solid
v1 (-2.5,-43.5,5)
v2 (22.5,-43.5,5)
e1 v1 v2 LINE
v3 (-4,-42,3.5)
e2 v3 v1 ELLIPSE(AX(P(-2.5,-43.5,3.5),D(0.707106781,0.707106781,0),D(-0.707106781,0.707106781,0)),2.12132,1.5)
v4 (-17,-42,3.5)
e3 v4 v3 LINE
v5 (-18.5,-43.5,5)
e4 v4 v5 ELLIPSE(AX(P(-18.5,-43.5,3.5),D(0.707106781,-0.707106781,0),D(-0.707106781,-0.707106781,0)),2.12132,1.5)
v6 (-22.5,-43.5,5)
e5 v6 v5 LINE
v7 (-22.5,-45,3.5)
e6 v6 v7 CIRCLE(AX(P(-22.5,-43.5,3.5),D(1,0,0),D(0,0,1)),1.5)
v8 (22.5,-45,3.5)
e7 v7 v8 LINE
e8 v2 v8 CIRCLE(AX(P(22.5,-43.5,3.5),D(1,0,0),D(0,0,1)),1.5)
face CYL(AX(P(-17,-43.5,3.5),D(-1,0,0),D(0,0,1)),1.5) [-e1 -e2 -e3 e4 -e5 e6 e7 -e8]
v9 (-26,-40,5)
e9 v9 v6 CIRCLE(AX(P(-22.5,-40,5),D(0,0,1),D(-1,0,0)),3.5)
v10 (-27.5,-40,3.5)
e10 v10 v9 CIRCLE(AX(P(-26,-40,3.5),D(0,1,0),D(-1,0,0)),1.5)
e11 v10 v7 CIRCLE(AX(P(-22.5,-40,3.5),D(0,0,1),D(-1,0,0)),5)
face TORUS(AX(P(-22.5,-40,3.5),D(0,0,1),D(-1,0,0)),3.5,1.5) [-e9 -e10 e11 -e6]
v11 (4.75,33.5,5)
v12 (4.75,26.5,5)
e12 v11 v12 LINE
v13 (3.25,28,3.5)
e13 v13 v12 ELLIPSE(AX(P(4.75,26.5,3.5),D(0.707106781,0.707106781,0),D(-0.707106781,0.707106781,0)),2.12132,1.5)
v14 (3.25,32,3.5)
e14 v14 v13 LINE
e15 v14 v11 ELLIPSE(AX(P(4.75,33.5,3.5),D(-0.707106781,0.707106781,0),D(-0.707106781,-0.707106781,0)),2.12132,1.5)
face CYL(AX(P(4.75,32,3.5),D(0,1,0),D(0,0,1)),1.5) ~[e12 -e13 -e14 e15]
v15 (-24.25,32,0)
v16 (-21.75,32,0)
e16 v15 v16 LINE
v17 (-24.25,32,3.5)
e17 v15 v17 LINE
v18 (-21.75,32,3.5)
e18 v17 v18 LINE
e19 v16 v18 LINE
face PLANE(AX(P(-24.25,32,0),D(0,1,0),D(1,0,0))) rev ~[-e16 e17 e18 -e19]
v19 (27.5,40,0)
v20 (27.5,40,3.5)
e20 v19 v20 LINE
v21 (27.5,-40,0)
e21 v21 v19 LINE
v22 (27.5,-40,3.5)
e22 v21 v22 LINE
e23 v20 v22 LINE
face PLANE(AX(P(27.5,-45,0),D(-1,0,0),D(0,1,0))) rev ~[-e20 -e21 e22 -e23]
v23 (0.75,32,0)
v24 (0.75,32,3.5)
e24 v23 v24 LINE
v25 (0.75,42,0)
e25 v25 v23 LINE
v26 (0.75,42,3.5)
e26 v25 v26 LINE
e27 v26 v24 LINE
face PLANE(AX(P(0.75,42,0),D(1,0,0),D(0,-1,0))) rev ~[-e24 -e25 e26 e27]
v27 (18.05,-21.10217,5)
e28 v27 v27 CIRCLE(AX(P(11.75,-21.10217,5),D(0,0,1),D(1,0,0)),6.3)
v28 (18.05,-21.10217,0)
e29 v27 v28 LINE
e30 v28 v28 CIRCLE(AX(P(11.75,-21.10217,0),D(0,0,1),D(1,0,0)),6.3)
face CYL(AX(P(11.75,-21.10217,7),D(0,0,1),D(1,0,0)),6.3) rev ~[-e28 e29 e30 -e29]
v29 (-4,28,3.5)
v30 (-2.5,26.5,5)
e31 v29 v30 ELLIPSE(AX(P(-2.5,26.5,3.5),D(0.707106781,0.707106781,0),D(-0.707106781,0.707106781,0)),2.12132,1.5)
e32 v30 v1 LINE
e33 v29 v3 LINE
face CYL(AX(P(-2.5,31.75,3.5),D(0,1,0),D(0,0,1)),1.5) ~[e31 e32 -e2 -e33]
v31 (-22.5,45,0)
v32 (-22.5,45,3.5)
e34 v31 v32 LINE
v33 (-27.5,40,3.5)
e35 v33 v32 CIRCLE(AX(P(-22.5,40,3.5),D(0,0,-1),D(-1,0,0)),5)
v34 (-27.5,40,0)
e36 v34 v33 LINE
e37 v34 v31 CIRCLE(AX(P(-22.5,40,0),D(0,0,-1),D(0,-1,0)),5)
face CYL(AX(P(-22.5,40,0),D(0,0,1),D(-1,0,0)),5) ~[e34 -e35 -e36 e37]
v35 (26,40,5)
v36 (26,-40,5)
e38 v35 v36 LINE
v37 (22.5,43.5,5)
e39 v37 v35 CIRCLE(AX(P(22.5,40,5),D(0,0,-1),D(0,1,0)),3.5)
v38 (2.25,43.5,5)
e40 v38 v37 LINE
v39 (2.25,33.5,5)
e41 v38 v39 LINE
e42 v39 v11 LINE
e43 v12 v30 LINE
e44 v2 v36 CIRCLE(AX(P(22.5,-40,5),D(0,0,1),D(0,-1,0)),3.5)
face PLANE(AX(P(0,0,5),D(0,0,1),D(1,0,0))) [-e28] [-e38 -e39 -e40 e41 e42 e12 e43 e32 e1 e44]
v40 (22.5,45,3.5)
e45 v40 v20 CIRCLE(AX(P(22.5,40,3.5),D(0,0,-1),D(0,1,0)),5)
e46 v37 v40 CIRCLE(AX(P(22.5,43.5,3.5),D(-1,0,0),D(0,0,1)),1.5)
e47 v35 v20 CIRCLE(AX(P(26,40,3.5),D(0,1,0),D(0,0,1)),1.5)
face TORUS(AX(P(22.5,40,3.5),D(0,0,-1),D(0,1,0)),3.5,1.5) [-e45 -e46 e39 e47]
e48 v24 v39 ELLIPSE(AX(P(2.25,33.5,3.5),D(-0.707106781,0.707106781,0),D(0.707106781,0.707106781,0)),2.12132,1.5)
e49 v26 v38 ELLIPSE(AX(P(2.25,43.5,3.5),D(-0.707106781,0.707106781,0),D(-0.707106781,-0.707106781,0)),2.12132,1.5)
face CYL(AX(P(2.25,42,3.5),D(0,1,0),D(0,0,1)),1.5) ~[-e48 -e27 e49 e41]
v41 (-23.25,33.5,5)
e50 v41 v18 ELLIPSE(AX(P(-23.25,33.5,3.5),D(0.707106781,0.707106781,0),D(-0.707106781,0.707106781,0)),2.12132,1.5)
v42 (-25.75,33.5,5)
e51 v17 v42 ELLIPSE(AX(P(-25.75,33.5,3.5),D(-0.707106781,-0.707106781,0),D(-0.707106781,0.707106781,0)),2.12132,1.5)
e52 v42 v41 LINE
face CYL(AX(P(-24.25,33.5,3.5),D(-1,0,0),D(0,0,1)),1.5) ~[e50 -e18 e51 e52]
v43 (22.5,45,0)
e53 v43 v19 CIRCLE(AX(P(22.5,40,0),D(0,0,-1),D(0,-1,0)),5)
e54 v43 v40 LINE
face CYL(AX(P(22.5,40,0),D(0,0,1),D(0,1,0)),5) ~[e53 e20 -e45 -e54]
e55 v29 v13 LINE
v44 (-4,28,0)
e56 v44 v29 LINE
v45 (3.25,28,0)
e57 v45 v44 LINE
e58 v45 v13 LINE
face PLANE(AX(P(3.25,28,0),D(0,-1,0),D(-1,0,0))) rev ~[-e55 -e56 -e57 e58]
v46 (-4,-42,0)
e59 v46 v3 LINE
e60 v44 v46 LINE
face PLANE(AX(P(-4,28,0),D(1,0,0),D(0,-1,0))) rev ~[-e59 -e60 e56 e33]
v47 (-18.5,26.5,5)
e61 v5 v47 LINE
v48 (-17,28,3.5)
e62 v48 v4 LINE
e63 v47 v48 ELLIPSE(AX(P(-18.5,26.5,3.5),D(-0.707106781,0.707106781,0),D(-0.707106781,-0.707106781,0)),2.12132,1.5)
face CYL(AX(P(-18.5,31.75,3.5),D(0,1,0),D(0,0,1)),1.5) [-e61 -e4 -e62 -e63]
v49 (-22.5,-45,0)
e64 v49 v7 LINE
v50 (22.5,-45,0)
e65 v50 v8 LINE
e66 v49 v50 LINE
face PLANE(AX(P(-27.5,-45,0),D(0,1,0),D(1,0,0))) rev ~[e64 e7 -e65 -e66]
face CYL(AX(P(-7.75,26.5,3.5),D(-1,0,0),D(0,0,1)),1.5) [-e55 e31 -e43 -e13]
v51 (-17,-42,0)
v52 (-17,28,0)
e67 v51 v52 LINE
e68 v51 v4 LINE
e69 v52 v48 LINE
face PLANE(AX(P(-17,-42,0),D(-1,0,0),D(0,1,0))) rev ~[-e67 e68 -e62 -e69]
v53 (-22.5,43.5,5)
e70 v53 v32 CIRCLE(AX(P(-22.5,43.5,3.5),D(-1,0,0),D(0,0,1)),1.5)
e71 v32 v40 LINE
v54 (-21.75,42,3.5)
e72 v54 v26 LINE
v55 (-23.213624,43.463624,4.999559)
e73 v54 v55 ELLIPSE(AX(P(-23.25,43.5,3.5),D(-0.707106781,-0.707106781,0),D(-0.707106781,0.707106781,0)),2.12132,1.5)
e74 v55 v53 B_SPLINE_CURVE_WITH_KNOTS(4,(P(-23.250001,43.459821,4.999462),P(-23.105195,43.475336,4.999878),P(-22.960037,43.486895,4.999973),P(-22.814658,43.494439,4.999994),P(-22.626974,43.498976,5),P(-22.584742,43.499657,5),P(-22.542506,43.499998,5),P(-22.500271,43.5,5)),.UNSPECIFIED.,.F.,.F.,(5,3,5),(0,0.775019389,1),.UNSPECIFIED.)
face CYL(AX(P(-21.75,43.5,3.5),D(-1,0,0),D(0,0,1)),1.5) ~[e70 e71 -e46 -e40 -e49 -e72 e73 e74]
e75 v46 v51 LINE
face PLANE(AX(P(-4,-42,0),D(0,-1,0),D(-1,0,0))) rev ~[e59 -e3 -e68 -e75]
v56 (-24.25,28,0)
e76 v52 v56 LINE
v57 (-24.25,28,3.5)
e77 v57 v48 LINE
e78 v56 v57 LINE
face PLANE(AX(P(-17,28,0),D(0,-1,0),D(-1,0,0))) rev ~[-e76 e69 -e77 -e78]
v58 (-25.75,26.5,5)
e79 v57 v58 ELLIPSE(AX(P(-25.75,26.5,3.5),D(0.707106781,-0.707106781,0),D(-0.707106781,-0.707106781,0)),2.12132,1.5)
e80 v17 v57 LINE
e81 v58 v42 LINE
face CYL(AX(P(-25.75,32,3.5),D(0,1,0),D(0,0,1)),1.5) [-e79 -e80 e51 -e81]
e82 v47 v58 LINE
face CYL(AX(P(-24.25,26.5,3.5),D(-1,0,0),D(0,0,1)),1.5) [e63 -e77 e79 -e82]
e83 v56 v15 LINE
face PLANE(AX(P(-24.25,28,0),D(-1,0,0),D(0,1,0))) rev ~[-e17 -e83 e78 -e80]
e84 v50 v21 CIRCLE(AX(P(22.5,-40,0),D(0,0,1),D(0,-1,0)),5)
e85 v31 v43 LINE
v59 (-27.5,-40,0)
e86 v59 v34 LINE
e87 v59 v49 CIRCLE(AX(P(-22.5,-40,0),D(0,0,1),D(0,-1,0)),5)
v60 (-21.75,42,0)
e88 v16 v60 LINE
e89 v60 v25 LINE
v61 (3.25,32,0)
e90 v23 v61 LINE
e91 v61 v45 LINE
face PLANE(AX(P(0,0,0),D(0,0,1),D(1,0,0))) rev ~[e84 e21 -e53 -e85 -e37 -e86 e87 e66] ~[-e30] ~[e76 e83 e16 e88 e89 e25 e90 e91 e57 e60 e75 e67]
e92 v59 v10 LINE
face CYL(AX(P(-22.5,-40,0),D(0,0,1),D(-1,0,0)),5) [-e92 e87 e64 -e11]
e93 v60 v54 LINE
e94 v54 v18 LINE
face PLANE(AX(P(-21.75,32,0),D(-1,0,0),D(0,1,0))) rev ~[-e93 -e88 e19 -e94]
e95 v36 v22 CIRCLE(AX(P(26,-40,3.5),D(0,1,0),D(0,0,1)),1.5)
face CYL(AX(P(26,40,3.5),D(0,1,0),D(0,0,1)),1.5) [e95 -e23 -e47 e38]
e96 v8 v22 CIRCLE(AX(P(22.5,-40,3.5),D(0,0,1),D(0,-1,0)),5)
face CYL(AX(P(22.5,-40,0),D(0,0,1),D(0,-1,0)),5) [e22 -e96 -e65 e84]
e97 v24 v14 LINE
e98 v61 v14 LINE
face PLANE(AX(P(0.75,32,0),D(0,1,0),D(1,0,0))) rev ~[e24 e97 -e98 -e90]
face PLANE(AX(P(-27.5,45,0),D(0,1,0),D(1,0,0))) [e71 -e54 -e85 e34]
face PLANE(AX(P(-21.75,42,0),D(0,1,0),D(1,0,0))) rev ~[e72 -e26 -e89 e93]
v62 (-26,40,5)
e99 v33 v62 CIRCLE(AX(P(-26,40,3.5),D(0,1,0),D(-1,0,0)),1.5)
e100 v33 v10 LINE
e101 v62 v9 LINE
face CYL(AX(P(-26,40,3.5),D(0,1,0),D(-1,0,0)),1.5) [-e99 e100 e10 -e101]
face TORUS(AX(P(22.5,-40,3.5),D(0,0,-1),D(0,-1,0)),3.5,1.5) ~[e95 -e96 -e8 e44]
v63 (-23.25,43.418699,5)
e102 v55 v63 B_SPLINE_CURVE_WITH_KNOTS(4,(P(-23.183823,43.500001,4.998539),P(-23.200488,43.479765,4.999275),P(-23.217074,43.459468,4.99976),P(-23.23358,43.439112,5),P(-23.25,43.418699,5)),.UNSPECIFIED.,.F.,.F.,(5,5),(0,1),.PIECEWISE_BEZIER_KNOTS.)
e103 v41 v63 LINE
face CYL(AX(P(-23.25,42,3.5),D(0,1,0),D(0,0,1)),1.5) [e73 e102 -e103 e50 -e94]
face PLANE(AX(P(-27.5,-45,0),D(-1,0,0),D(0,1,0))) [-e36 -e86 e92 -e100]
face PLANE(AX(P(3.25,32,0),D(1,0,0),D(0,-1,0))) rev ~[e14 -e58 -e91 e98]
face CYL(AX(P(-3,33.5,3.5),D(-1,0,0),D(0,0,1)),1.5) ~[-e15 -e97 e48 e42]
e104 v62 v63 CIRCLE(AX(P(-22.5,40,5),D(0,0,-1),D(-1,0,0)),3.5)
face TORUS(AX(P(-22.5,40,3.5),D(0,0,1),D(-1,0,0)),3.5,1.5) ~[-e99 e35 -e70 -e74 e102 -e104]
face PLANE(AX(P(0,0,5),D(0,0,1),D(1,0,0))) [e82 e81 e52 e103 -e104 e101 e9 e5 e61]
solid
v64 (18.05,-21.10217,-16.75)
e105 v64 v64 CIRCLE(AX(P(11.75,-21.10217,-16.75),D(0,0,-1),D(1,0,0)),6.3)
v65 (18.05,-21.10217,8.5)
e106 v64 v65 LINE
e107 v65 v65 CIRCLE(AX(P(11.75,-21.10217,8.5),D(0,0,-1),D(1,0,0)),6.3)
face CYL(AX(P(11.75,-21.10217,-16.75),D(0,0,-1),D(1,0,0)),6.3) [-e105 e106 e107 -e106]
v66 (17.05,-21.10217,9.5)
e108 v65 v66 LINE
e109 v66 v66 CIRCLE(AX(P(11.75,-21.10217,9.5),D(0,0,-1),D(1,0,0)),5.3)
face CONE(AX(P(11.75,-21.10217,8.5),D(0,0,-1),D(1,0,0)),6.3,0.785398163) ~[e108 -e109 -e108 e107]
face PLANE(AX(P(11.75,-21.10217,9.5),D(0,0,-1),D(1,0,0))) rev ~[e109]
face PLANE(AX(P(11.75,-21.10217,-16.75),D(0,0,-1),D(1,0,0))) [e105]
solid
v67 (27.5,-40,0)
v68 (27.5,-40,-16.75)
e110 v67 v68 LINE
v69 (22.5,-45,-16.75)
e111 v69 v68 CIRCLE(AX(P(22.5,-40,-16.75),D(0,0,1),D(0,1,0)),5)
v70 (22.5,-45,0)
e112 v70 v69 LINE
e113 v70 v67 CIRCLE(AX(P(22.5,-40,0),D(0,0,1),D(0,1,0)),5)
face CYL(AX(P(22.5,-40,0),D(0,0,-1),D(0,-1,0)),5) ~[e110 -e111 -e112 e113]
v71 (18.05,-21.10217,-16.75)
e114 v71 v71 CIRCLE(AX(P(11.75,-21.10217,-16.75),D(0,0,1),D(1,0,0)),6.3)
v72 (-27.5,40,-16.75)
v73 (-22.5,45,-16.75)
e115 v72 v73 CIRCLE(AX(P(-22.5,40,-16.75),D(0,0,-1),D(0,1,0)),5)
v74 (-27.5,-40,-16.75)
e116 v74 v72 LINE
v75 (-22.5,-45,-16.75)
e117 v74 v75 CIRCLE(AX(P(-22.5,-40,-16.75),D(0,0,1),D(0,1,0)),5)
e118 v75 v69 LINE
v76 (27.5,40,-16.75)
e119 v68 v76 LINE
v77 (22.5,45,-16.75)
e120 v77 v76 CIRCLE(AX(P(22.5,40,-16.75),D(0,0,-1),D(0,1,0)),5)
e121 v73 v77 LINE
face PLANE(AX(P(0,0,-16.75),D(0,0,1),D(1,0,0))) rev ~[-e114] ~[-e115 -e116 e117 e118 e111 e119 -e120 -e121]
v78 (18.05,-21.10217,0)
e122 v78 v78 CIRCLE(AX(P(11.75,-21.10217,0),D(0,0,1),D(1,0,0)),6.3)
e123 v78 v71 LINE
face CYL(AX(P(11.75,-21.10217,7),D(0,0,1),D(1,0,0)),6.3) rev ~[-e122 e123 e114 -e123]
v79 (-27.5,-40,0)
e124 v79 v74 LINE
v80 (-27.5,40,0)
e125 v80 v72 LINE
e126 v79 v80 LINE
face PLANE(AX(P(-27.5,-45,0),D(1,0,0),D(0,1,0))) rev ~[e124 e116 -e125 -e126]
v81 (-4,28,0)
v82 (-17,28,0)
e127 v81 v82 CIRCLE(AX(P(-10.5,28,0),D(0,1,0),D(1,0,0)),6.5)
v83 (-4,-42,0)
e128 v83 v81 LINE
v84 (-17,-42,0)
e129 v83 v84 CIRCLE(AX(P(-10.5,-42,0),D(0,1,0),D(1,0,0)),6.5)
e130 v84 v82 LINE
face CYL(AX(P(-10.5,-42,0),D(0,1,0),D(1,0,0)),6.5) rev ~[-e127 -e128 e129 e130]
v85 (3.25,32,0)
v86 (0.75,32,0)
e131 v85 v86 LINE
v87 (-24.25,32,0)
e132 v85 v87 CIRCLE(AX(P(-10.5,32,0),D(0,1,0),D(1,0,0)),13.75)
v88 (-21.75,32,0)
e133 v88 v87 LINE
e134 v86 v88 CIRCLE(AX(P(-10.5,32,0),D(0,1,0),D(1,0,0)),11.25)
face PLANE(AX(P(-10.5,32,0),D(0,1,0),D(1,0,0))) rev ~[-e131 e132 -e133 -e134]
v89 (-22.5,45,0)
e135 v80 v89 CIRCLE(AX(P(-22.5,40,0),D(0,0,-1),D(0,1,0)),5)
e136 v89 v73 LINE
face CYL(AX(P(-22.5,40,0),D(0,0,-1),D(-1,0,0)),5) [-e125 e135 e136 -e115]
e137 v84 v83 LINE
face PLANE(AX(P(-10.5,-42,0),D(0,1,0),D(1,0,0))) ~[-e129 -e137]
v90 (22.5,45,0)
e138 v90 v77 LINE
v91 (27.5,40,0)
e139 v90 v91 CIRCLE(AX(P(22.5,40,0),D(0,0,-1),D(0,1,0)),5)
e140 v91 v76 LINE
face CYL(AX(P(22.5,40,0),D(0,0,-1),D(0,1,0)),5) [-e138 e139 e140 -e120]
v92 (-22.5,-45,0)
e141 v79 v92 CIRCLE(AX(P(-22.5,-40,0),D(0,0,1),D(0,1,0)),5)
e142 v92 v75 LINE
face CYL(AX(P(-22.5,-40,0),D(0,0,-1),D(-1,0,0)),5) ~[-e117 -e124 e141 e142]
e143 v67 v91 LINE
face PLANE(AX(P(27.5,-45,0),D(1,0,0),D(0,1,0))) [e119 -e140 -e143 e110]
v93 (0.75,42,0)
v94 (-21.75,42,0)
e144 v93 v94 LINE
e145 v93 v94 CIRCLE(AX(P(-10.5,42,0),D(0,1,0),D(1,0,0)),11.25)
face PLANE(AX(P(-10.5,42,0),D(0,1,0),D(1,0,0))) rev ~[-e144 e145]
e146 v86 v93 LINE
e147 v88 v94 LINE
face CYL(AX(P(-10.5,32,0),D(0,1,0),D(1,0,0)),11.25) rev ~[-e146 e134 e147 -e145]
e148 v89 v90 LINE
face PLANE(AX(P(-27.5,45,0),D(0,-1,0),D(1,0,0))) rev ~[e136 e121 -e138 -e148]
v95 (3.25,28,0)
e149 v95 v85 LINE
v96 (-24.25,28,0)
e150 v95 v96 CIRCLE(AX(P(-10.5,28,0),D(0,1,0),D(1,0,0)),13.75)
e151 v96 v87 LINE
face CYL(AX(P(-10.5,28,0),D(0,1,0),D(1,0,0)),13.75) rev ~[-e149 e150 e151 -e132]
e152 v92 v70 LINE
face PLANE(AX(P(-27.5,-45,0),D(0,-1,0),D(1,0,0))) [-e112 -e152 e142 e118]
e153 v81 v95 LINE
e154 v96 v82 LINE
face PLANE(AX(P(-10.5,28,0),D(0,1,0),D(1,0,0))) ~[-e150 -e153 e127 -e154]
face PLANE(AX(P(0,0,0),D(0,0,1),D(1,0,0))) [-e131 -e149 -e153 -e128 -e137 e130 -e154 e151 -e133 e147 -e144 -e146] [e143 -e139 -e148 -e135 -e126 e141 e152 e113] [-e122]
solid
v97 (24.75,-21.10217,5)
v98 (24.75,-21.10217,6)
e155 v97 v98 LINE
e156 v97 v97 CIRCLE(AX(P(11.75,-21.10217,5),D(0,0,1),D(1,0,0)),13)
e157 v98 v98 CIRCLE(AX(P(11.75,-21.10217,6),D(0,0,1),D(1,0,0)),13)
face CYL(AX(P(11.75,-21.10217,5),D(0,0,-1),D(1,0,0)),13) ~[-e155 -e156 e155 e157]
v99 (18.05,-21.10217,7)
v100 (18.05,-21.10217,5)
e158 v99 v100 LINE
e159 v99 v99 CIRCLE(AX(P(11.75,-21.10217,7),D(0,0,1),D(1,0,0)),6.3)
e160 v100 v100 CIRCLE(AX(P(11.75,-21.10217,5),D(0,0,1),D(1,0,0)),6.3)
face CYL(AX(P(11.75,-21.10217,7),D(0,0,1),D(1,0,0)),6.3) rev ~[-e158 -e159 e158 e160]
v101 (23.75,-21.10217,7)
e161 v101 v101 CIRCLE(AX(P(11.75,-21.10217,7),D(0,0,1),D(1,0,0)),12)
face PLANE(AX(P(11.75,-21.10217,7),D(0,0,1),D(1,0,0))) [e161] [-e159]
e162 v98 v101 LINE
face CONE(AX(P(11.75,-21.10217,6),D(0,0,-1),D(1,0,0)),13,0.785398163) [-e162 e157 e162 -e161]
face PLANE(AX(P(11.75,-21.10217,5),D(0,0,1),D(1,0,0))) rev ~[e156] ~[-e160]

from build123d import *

# Parameters (mm, degrees)
F0_W           = 55
F0_H           = 90
F1_DEPTH       = 16.75
F4_R           = 13
F5_DEPTH       = 2
F7_W           = 55
F7_H           = 90
F8_DEPTH       = 5
F9_R           = 13
F10_DEPTH      = 2
F11_R          = 6.3
F12_DEPTH      = 23.751
F13_R          = 5
F13_2_R        = 5
F14_SIZE       = 1
F15_T1_DEPTH   = 22.5
F15_T3_DEPTH   = 13.75
F15_T5_DEPTH   = 6.25
F15_T7_DEPTH   = 4
F15_T9_DEPTH   = 11
F15_T11_DEPTH  = 73.75
F15_T13_DEPTH  = 13
F15_T15_DEPTH  = 11
F15_T17_DEPTH  = 6.25
F15_T19_DEPTH  = 80
F15_T21_DEPTH  = 45
F15_T24_ANGLE  = 90
F15_T26_ANGLE  = 90
F15_T28_ANGLE  = 90
F15_T30_ANGLE  = 90
F15_T35_DEPTH  = 26.25
F15_T39_DEPTH  = 17.5
F15_T46_DEPTH  = 26.25
F15_T50_DEPTH  = 17.5
F15_T57_DEPTH  = 10
F15_T61_DEPTH  = 7.75
F15_T68_DEPTH  = 7.75
F15_T72_DEPTH  = 14.75
F15_T79_DEPTH  = 77.5
F15_T83_DEPTH  = 16.75
F15_T90_DEPTH  = 77.5
F15_T94_DEPTH  = 16.75
F15_T101_DEPTH = 7.75
F15_T105_DEPTH = 14.75
F15_T112_DEPTH = 10
F15_T116_DEPTH = 7.75
F16_R          = 6.3
F17_DEPTH      = 26.25
F18_SIZE       = 1


# Not quite as in the source:
# - a fillet or chamfer that OpenCascade refuses, or shapes differently, is made with other operations: its cross-section is extruded or revolved along the edge and cut away or added


with BuildPart() as f1:
    # F0 (on Top) → F1 (new body)
    with BuildSketch(Plane.XY):
        Rectangle(F0_W, F0_H)
    extrude(amount=-F1_DEPTH)

    # F2 (on face) → F3 (revolve, cut)
    with BuildSketch(Plane.XY):
        Polygon((0.75, 42), (-10.5, 42), (-10.5, -42), (-4, -42), (-4, 28), (3.25, 28), (3.25, 32), (0.75, 32), align=None)
    revolve(axis=Axis((-10.5, 0, 0), (0, 1, 0)), mode=Mode.SUBTRACT)


with BuildPart() as f5:
    # F4 (on face) → F5 (new body)
    with BuildSketch(Plane.XY):
        with Locations((12.5, -25)):
            Circle(F4_R)
    extrude(amount=F5_DEPTH)


with BuildPart() as f8:
    # F7 (on face) → F8 (new body)
    with BuildSketch(Plane.XY):
        Rectangle(F7_W, F7_H)
        Polygon((-21.75, 42), (0.75, 42), (0.75, 32), (3.25, 32), (3.25, 28), (-4, 28), (-4, -42), (-17, -42), (-17, 28), (-24.25, 28), (-24.25, 32), (-21.75, 32), align=None, mode=Mode.SUBTRACT)
    extrude(amount=F8_DEPTH)


with BuildPart() as f10:
    # F9 (on face) → F10 (new body)
    with BuildSketch(Plane.XY.offset(5)):
        with Locations((11.75, -21.1021695286)):
            Circle(F9_R)
    extrude(amount=F10_DEPTH)


with BuildPart() as f12_tool:
    # F11 (on face) → F12 (new body, through all)
    with BuildSketch(Plane.XY.offset(7)):
        with Locations((11.75, -21.1021695286)):
            Circle(F11_R)
    extrude(amount=-F12_DEPTH)


with BuildPart() as f1_1:
    add(f1.part)

    # F12: cut by f12_tool
    add(f12_tool.part, mode=Mode.SUBTRACT)

    # F13
    f13_edges = [f1_1.edges().sort_by_distance(p)[0] for p in [
        (-27.5, -45, -8.375),
        (27.5, -45, -8.375),
        (27.5, 45, -8.375),
        (-27.5, 45, -8.375),
    ]]
    fillet(f13_edges, radius=F13_R)


with BuildPart() as f8_1:
    add(f8.part)

    # F12: cut by f12_tool
    add(f12_tool.part, mode=Mode.SUBTRACT)

    # F13#2
    f13_2_edges = [f8_1.edges().sort_by_distance(p)[0] for p in [
        (-27.5, -45, 2.5),
        (27.5, -45, 2.5),
        (27.5, 45, 2.5),
        (-27.5, 45, 2.5),
    ]]
    fillet(f13_2_edges, radius=F13_2_R)

    # F15: fillet of radius 1.5 on 13 edges, made by hand

    # F15_s2 → F15_t1 (cut)
    with BuildSketch(Plane.YZ.offset(-21.75)):
        with BuildLine():
            ThreePointArc((43.5, 5), (42.4393398282, 4.5606601718), (42, 3.5))
            Line((42, 3.5), (42, 5))
            Line((42, 5), (43.5, 5))
        make_face()
    extrude(amount=F15_T1_DEPTH, mode=Mode.SUBTRACT)

    # F15_s4 → F15_t3 (cut)
    with BuildSketch(Plane.XZ.offset(-42)):
        with BuildLine():
            ThreePointArc((-23.25, 5), (-22.1893398282, 4.5606601718), (-21.75, 3.5))
            Line((-21.75, 3.5), (-21.75, 5))
            Line((-21.75, 5), (-23.25, 5))
        make_face()
        with BuildLine():
            ThreePointArc((2.25, 5), (1.1893398282, 4.5606601718), (0.75, 3.5))
            Line((0.75, 3.5), (0.75, 5))
            Line((0.75, 5), (2.25, 5))
        make_face()
    extrude(amount=F15_T3_DEPTH, mode=Mode.SUBTRACT)

    # F15_s6 → F15_t5 (cut)
    with BuildSketch(Plane.YZ.offset(-24.25)):
        with BuildLine():
            ThreePointArc((33.5, 5), (32.4393398282, 4.5606601718), (32, 3.5))
            Line((32, 3.5), (32, 5))
            Line((32, 5), (33.5, 5))
        make_face()
    extrude(amount=F15_T5_DEPTH, mode=Mode.SUBTRACT)

    # F15_s8 → F15_t7 (cut)
    with BuildSketch(Plane.XZ.offset(-32)):
        with BuildLine():
            ThreePointArc((-25.75, 5), (-24.6893398282, 4.5606601718), (-24.25, 3.5))
            Line((-24.25, 3.5), (-24.25, 5))
            Line((-24.25, 5), (-25.75, 5))
        make_face()
        with BuildLine():
            ThreePointArc((4.75, 5), (3.6893398282, 4.5606601718), (3.25, 3.5))
            Line((3.25, 3.5), (3.25, 5))
            Line((3.25, 5), (4.75, 5))
        make_face()
    extrude(amount=F15_T7_DEPTH, mode=Mode.SUBTRACT)

    # F15_s10 → F15_t9 (cut)
    with BuildSketch(Plane.YZ.offset(-24.25)):
        with BuildLine():
            ThreePointArc((26.5, 5), (27.5606601718, 4.5606601718), (28, 3.5))
            Line((28, 3.5), (28, 5))
            Line((28, 5), (26.5, 5))
        make_face()
    extrude(amount=F15_T9_DEPTH, mode=Mode.SUBTRACT)

    # F15_s12 → F15_t11 (cut)
    with BuildSketch(Plane.XZ.offset(-31.75)):
        with BuildLine():
            ThreePointArc((-18.5, 5), (-17.4393398282, 4.5606601718), (-17, 3.5))
            Line((-17, 3.5), (-17, 5))
            Line((-17, 5), (-18.5, 5))
        make_face()
        with BuildLine():
            ThreePointArc((-2.5, 5), (-3.5606601718, 4.5606601718), (-4, 3.5))
            Line((-4, 3.5), (-4, 5))
            Line((-4, 5), (-2.5, 5))
        make_face()
    extrude(amount=F15_T11_DEPTH, mode=Mode.SUBTRACT)

    # F15_s14 → F15_t13 (cut)
    with BuildSketch(Plane.YZ.offset(-17)):
        with BuildLine():
            ThreePointArc((-43.5, 5), (-42.4393398282, 4.5606601718), (-42, 3.5))
            Line((-42, 3.5), (-42, 5))
            Line((-42, 5), (-43.5, 5))
        make_face()
    extrude(amount=F15_T13_DEPTH, mode=Mode.SUBTRACT)

    # F15_s16 → F15_t15 (cut)
    with BuildSketch(Plane.YZ.offset(-7.75)):
        with BuildLine():
            ThreePointArc((26.5, 5), (27.5606601718, 4.5606601718), (28, 3.5))
            Line((28, 3.5), (28, 5))
            Line((28, 5), (26.5, 5))
        make_face()
    extrude(amount=F15_T15_DEPTH, mode=Mode.SUBTRACT)

    # F15_s18 → F15_t17 (cut)
    with BuildSketch(Plane.YZ.offset(-3)):
        with BuildLine():
            ThreePointArc((33.5, 5), (32.4393398282, 4.5606601718), (32, 3.5))
            Line((32, 3.5), (32, 5))
            Line((32, 5), (33.5, 5))
        make_face()
    extrude(amount=F15_T17_DEPTH, mode=Mode.SUBTRACT)

    # F15_s20 → F15_t19 (cut)
    with BuildSketch(Plane.XZ.offset(-40)):
        with BuildLine():
            ThreePointArc((26, 5), (27.0606601718, 4.5606601718), (27.5, 3.5))
            Line((27.5, 3.5), (27.5, 5))
            Line((27.5, 5), (26, 5))
        make_face()
        with BuildLine():
            ThreePointArc((-27.5, 3.5), (-27.0606601718, 4.5606601718), (-26, 5))
            Line((-26, 5), (-27.5, 5))
            Line((-27.5, 5), (-27.5, 3.5))
        make_face()
    extrude(amount=F15_T19_DEPTH, mode=Mode.SUBTRACT)

    # F15_s22 → F15_t21 (cut)
    with BuildSketch(Plane.YZ.offset(-22.5)):
        with BuildLine():
            ThreePointArc((43.5, 5), (44.5606601718, 4.5606601718), (45, 3.5))
            Line((45, 3.5), (45, 5))
            Line((45, 5), (43.5, 5))
        make_face()
        with BuildLine():
            ThreePointArc((-43.5, 5), (-44.5606601718, 4.5606601718), (-45, 3.5))
            Line((-45, 3.5), (-45, 5))
            Line((-45, 5), (-43.5, 5))
        make_face()
    extrude(amount=F15_T21_DEPTH, mode=Mode.SUBTRACT)

    # F15_s23 → F15_t24 (revolve, cut)
    with BuildSketch(Plane.YZ.offset(22.5)):
        with BuildLine():
            ThreePointArc((-43.5, 5), (-44.5606601718, 4.5606601718), (-45, 3.5))
            Line((-45, 3.5), (-45, 5))
            Line((-45, 5), (-43.5, 5))
        make_face()
    revolve(axis=Axis((22.5, -40, 5), (0, 0, 1)), revolution_arc=F15_T24_ANGLE, mode=Mode.SUBTRACT)

    # F15_s25 → F15_t26 (revolve, cut)
    with BuildSketch(Plane.YZ.offset(22.5)):
        with BuildLine():
            ThreePointArc((43.5, 5), (44.5606601718, 4.5606601718), (45, 3.5))
            Line((45, 3.5), (45, 5))
            Line((45, 5), (43.5, 5))
        make_face()
    revolve(axis=Axis((22.5, 40, 5), (0, 0, -1)), revolution_arc=F15_T26_ANGLE, mode=Mode.SUBTRACT)

    # F15_s27 → F15_t28 (revolve, cut)
    with BuildSketch(Plane.XZ.offset(-40)):
        with BuildLine():
            ThreePointArc((-27.5, 3.5), (-27.0606601718, 4.5606601718), (-26, 5))
            Line((-26, 5), (-27.5, 5))
            Line((-27.5, 5), (-27.5, 3.5))
        make_face()
    revolve(axis=Axis((-22.5, 40, 5), (0, 0, -1)), revolution_arc=F15_T28_ANGLE, mode=Mode.SUBTRACT)

    # F15_s29 → F15_t30 (revolve, cut)
    with BuildSketch(Plane.XZ.offset(40)):
        with BuildLine():
            ThreePointArc((-27.5, 3.5), (-27.0606601718, 4.5606601718), (-26, 5))
            Line((-26, 5), (-27.5, 5))
            Line((-27.5, 5), (-27.5, 3.5))
        make_face()
    revolve(axis=Axis((-22.5, -40, 5), (0, 0, 1)), revolution_arc=F15_T30_ANGLE, mode=Mode.SUBTRACT)


with BuildPart() as f10_1:
    add(f10.part)

    # F12: cut by f12_tool
    add(f12_tool.part, mode=Mode.SUBTRACT)

    # F14
    f14_edges = [f10_1.edges().sort_by_distance(p)[0] for p in [
        (-1.25, -21.10217, 7),
    ]]
    chamfer(f14_edges, length=F14_SIZE)


with BuildPart() as f15_tool33:
    # F15_s34 → F15_t35 (new body)
    with BuildSketch(Plane.YZ.offset(-25.5)):
        with BuildLine():
            ThreePointArc((43.5, 5), (42.4393398282, 4.5606601718), (42, 3.5))
            Line((42, 3.5), (42, 5))
            Line((42, 5), (43.5, 5))
        make_face()
    extrude(amount=F15_T35_DEPTH)

    split(bisect_by=Plane.YZ.offset(-21.75), keep=Keep.BOTTOM)


with BuildPart() as f15_tool37:
    # F15_s38 → F15_t39 (new body)
    with BuildSketch(Plane.XZ.offset(-28.25)):
        with BuildLine():
            ThreePointArc((-23.25, 5), (-22.1893398282, 4.5606601718), (-21.75, 3.5))
            Line((-21.75, 3.5), (-21.75, 5))
            Line((-21.75, 5), (-23.25, 5))
        make_face()
    extrude(amount=-F15_T39_DEPTH)

    split(bisect_by=Plane.XZ.offset(-42), keep=Keep.BOTTOM)


with BuildPart() as f15_tool33_1:
    add(f15_tool33.part)

    # F15_t41: intersect F15_tool37
    add(f15_tool37.part, mode=Mode.INTERSECT)


with BuildPart() as f8_2:
    add(f8_1.part)

    # F15_t31: cut F15_tool33
    add(f15_tool33_1.part, mode=Mode.SUBTRACT)


with BuildPart() as f15_tool44:
    # F15_s45 → F15_t46 (new body)
    with BuildSketch(Plane.YZ.offset(-21.75)):
        with BuildLine():
            ThreePointArc((43.5, 5), (42.4393398282, 4.5606601718), (42, 3.5))
            Line((42, 3.5), (42, 5))
            Line((42, 5), (43.5, 5))
        make_face()
    extrude(amount=F15_T46_DEPTH)

    split(bisect_by=Plane.YZ.offset(0.75), keep=Keep.TOP)


with BuildPart() as f15_tool48:
    # F15_s49 → F15_t50 (new body)
    with BuildSketch(Plane.XZ.offset(-45.75)):
        with BuildLine():
            ThreePointArc((2.25, 5), (1.1893398282, 4.5606601718), (0.75, 3.5))
            Line((0.75, 3.5), (0.75, 5))
            Line((0.75, 5), (2.25, 5))
        make_face()
    extrude(amount=F15_T50_DEPTH)

    split(bisect_by=Plane.XZ.offset(-42), keep=Keep.BOTTOM)


with BuildPart() as f15_tool44_1:
    add(f15_tool44.part)

    # F15_t52: intersect F15_tool48
    add(f15_tool48.part, mode=Mode.INTERSECT)


with BuildPart() as f8_3:
    add(f8_2.part)

    # F15_t42: cut F15_tool44
    add(f15_tool44_1.part, mode=Mode.SUBTRACT)


with BuildPart() as f15_tool55:
    # F15_s56 → F15_t57 (new body)
    with BuildSketch(Plane.YZ.offset(-28)):
        with BuildLine():
            ThreePointArc((33.5, 5), (32.4393398282, 4.5606601718), (32, 3.5))
            Line((32, 3.5), (32, 5))
            Line((32, 5), (33.5, 5))
        make_face()
    extrude(amount=F15_T57_DEPTH)

    split(bisect_by=Plane.YZ.offset(-24.25), keep=Keep.BOTTOM)


with BuildPart() as f15_tool59:
    # F15_s60 → F15_t61 (new body)
    with BuildSketch(Plane.XZ.offset(-28)):
        with BuildLine():
            ThreePointArc((-25.75, 5), (-24.6893398282, 4.5606601718), (-24.25, 3.5))
            Line((-24.25, 3.5), (-24.25, 5))
            Line((-24.25, 5), (-25.75, 5))
        make_face()
    extrude(amount=-F15_T61_DEPTH)

    split(bisect_by=Plane.XZ.offset(-32), keep=Keep.BOTTOM)


with BuildPart() as f15_tool55_1:
    add(f15_tool55.part)

    # F15_t63: intersect F15_tool59
    add(f15_tool59.part, mode=Mode.INTERSECT)


with BuildPart() as f8_4:
    add(f8_3.part)

    # F15_t53: cut F15_tool55
    add(f15_tool55_1.part, mode=Mode.SUBTRACT)


with BuildPart() as f15_tool66:
    # F15_s67 → F15_t68 (new body)
    with BuildSketch(Plane.XZ.offset(-24.25)):
        with BuildLine():
            ThreePointArc((-25.75, 5), (-24.6893398282, 4.5606601718), (-24.25, 3.5))
            Line((-24.25, 3.5), (-24.25, 5))
            Line((-24.25, 5), (-25.75, 5))
        make_face()
    extrude(amount=-F15_T68_DEPTH)

    split(bisect_by=Plane.XZ.offset(-28), keep=Keep.TOP)


with BuildPart() as f15_tool70:
    # F15_s71 → F15_t72 (new body)
    with BuildSketch(Plane.YZ.offset(-13.25)):
        with BuildLine():
            ThreePointArc((26.5, 5), (27.5606601718, 4.5606601718), (28, 3.5))
            Line((28, 3.5), (28, 5))
            Line((28, 5), (26.5, 5))
        make_face()
    extrude(amount=-F15_T72_DEPTH)

    split(bisect_by=Plane.YZ.offset(-24.25), keep=Keep.BOTTOM)


with BuildPart() as f15_tool66_1:
    add(f15_tool66.part)

    # F15_t74: intersect F15_tool70
    add(f15_tool70.part, mode=Mode.INTERSECT)


with BuildPart() as f8_5:
    add(f8_4.part)

    # F15_t64: cut F15_tool66
    add(f15_tool66_1.part, mode=Mode.SUBTRACT)


with BuildPart() as f15_tool77:
    # F15_s78 → F15_t79 (new body)
    with BuildSketch(Plane.XZ.offset(45.75)):
        with BuildLine():
            ThreePointArc((-18.5, 5), (-17.4393398282, 4.5606601718), (-17, 3.5))
            Line((-17, 3.5), (-17, 5))
            Line((-17, 5), (-18.5, 5))
        make_face()
    extrude(amount=-F15_T79_DEPTH)

    split(bisect_by=Plane.XZ.offset(42), keep=Keep.TOP)


with BuildPart() as f15_tool81:
    # F15_s82 → F15_t83 (new body)
    with BuildSketch(Plane.YZ.offset(-4)):
        with BuildLine():
            ThreePointArc((-43.5, 5), (-42.4393398282, 4.5606601718), (-42, 3.5))
            Line((-42, 3.5), (-42, 5))
            Line((-42, 5), (-43.5, 5))
        make_face()
    extrude(amount=-F15_T83_DEPTH)

    split(bisect_by=Plane.YZ.offset(-17), keep=Keep.BOTTOM)


with BuildPart() as f15_tool77_1:
    add(f15_tool77.part)

    # F15_t85: intersect F15_tool81
    add(f15_tool81.part, mode=Mode.INTERSECT)


with BuildPart() as f8_6:
    add(f8_5.part)

    # F15_t75: cut F15_tool77
    add(f15_tool77_1.part, mode=Mode.SUBTRACT)


with BuildPart() as f15_tool88:
    # F15_s89 → F15_t90 (new body)
    with BuildSketch(Plane.XZ.offset(-31.75)):
        with BuildLine():
            ThreePointArc((-2.5, 5), (-3.5606601718, 4.5606601718), (-4, 3.5))
            Line((-4, 3.5), (-4, 5))
            Line((-4, 5), (-2.5, 5))
        make_face()
    extrude(amount=F15_T90_DEPTH)

    split(bisect_by=Plane.XZ.offset(42), keep=Keep.TOP)


with BuildPart() as f15_tool92:
    # F15_s93 → F15_t94 (new body)
    with BuildSketch(Plane.YZ.offset(-0.25)):
        with BuildLine():
            ThreePointArc((-43.5, 5), (-42.4393398282, 4.5606601718), (-42, 3.5))
            Line((-42, 3.5), (-42, 5))
            Line((-42, 5), (-43.5, 5))
        make_face()
    extrude(amount=-F15_T94_DEPTH)

    split(bisect_by=Plane.YZ.offset(-4), keep=Keep.TOP)


with BuildPart() as f15_tool88_1:
    add(f15_tool88.part)

    # F15_t96: intersect F15_tool92
    add(f15_tool92.part, mode=Mode.INTERSECT)


with BuildPart() as f8_7:
    add(f8_6.part)

    # F15_t86: cut F15_tool88
    add(f15_tool88_1.part, mode=Mode.SUBTRACT)


with BuildPart() as f15_tool99:
    # F15_s100 → F15_t101 (new body)
    with BuildSketch(Plane.XZ.offset(-32)):
        with BuildLine():
            ThreePointArc((4.75, 5), (3.6893398282, 4.5606601718), (3.25, 3.5))
            Line((3.25, 3.5), (3.25, 5))
            Line((3.25, 5), (4.75, 5))
        make_face()
    extrude(amount=F15_T101_DEPTH)

    split(bisect_by=Plane.XZ.offset(-28), keep=Keep.TOP)


with BuildPart() as f15_tool103:
    # F15_s104 → F15_t105 (new body)
    with BuildSketch(Plane.YZ.offset(7)):
        with BuildLine():
            ThreePointArc((26.5, 5), (27.5606601718, 4.5606601718), (28, 3.5))
            Line((28, 3.5), (28, 5))
            Line((28, 5), (26.5, 5))
        make_face()
    extrude(amount=-F15_T105_DEPTH)

    split(bisect_by=Plane.YZ.offset(3.25), keep=Keep.TOP)


with BuildPart() as f15_tool99_1:
    add(f15_tool99.part)

    # F15_t107: intersect F15_tool103
    add(f15_tool103.part, mode=Mode.INTERSECT)


with BuildPart() as f8_8:
    add(f8_7.part)

    # F15_t97: cut F15_tool99
    add(f15_tool99_1.part, mode=Mode.SUBTRACT)


with BuildPart() as f15_tool110:
    # F15_s111 → F15_t112 (new body)
    with BuildSketch(Plane.YZ.offset(-3)):
        with BuildLine():
            ThreePointArc((33.5, 5), (32.4393398282, 4.5606601718), (32, 3.5))
            Line((32, 3.5), (32, 5))
            Line((32, 5), (33.5, 5))
        make_face()
    extrude(amount=F15_T112_DEPTH)

    split(bisect_by=Plane.YZ.offset(3.25), keep=Keep.TOP)


with BuildPart() as f15_tool114:
    # F15_s115 → F15_t116 (new body)
    with BuildSketch(Plane.XZ.offset(-35.75)):
        with BuildLine():
            ThreePointArc((4.75, 5), (3.6893398282, 4.5606601718), (3.25, 3.5))
            Line((3.25, 3.5), (3.25, 5))
            Line((3.25, 5), (4.75, 5))
        make_face()
    extrude(amount=F15_T116_DEPTH)

    split(bisect_by=Plane.XZ.offset(-32), keep=Keep.BOTTOM)


with BuildPart() as f15_tool110_1:
    add(f15_tool110.part)

    # F15_t118: intersect F15_tool114
    add(f15_tool114.part, mode=Mode.INTERSECT)


with BuildPart() as f8_9:
    add(f8_8.part)

    # F15_t108: cut F15_tool110
    add(f15_tool110_1.part, mode=Mode.SUBTRACT)


with BuildPart() as f17:
    # F16 (on face) → F17 (new body)
    with BuildSketch(Plane(origin=(0, 0, -16.75), x_dir=(1, 0, 0), z_dir=(0, 0, -1))):
        with Locations((11.75, 21.1021695286)):
            Circle(F16_R)
    extrude(amount=-F17_DEPTH)

    # F18
    f18_edges = [f17.edges().sort_by_distance(p)[0] for p in [
        (5.45, -21.10217, 9.5),
    ]]
    chamfer(f18_edges, length=F18_SIZE)


solid = Compound([f1_1.part, f10_1.part, f8_9.part, f17.part])
